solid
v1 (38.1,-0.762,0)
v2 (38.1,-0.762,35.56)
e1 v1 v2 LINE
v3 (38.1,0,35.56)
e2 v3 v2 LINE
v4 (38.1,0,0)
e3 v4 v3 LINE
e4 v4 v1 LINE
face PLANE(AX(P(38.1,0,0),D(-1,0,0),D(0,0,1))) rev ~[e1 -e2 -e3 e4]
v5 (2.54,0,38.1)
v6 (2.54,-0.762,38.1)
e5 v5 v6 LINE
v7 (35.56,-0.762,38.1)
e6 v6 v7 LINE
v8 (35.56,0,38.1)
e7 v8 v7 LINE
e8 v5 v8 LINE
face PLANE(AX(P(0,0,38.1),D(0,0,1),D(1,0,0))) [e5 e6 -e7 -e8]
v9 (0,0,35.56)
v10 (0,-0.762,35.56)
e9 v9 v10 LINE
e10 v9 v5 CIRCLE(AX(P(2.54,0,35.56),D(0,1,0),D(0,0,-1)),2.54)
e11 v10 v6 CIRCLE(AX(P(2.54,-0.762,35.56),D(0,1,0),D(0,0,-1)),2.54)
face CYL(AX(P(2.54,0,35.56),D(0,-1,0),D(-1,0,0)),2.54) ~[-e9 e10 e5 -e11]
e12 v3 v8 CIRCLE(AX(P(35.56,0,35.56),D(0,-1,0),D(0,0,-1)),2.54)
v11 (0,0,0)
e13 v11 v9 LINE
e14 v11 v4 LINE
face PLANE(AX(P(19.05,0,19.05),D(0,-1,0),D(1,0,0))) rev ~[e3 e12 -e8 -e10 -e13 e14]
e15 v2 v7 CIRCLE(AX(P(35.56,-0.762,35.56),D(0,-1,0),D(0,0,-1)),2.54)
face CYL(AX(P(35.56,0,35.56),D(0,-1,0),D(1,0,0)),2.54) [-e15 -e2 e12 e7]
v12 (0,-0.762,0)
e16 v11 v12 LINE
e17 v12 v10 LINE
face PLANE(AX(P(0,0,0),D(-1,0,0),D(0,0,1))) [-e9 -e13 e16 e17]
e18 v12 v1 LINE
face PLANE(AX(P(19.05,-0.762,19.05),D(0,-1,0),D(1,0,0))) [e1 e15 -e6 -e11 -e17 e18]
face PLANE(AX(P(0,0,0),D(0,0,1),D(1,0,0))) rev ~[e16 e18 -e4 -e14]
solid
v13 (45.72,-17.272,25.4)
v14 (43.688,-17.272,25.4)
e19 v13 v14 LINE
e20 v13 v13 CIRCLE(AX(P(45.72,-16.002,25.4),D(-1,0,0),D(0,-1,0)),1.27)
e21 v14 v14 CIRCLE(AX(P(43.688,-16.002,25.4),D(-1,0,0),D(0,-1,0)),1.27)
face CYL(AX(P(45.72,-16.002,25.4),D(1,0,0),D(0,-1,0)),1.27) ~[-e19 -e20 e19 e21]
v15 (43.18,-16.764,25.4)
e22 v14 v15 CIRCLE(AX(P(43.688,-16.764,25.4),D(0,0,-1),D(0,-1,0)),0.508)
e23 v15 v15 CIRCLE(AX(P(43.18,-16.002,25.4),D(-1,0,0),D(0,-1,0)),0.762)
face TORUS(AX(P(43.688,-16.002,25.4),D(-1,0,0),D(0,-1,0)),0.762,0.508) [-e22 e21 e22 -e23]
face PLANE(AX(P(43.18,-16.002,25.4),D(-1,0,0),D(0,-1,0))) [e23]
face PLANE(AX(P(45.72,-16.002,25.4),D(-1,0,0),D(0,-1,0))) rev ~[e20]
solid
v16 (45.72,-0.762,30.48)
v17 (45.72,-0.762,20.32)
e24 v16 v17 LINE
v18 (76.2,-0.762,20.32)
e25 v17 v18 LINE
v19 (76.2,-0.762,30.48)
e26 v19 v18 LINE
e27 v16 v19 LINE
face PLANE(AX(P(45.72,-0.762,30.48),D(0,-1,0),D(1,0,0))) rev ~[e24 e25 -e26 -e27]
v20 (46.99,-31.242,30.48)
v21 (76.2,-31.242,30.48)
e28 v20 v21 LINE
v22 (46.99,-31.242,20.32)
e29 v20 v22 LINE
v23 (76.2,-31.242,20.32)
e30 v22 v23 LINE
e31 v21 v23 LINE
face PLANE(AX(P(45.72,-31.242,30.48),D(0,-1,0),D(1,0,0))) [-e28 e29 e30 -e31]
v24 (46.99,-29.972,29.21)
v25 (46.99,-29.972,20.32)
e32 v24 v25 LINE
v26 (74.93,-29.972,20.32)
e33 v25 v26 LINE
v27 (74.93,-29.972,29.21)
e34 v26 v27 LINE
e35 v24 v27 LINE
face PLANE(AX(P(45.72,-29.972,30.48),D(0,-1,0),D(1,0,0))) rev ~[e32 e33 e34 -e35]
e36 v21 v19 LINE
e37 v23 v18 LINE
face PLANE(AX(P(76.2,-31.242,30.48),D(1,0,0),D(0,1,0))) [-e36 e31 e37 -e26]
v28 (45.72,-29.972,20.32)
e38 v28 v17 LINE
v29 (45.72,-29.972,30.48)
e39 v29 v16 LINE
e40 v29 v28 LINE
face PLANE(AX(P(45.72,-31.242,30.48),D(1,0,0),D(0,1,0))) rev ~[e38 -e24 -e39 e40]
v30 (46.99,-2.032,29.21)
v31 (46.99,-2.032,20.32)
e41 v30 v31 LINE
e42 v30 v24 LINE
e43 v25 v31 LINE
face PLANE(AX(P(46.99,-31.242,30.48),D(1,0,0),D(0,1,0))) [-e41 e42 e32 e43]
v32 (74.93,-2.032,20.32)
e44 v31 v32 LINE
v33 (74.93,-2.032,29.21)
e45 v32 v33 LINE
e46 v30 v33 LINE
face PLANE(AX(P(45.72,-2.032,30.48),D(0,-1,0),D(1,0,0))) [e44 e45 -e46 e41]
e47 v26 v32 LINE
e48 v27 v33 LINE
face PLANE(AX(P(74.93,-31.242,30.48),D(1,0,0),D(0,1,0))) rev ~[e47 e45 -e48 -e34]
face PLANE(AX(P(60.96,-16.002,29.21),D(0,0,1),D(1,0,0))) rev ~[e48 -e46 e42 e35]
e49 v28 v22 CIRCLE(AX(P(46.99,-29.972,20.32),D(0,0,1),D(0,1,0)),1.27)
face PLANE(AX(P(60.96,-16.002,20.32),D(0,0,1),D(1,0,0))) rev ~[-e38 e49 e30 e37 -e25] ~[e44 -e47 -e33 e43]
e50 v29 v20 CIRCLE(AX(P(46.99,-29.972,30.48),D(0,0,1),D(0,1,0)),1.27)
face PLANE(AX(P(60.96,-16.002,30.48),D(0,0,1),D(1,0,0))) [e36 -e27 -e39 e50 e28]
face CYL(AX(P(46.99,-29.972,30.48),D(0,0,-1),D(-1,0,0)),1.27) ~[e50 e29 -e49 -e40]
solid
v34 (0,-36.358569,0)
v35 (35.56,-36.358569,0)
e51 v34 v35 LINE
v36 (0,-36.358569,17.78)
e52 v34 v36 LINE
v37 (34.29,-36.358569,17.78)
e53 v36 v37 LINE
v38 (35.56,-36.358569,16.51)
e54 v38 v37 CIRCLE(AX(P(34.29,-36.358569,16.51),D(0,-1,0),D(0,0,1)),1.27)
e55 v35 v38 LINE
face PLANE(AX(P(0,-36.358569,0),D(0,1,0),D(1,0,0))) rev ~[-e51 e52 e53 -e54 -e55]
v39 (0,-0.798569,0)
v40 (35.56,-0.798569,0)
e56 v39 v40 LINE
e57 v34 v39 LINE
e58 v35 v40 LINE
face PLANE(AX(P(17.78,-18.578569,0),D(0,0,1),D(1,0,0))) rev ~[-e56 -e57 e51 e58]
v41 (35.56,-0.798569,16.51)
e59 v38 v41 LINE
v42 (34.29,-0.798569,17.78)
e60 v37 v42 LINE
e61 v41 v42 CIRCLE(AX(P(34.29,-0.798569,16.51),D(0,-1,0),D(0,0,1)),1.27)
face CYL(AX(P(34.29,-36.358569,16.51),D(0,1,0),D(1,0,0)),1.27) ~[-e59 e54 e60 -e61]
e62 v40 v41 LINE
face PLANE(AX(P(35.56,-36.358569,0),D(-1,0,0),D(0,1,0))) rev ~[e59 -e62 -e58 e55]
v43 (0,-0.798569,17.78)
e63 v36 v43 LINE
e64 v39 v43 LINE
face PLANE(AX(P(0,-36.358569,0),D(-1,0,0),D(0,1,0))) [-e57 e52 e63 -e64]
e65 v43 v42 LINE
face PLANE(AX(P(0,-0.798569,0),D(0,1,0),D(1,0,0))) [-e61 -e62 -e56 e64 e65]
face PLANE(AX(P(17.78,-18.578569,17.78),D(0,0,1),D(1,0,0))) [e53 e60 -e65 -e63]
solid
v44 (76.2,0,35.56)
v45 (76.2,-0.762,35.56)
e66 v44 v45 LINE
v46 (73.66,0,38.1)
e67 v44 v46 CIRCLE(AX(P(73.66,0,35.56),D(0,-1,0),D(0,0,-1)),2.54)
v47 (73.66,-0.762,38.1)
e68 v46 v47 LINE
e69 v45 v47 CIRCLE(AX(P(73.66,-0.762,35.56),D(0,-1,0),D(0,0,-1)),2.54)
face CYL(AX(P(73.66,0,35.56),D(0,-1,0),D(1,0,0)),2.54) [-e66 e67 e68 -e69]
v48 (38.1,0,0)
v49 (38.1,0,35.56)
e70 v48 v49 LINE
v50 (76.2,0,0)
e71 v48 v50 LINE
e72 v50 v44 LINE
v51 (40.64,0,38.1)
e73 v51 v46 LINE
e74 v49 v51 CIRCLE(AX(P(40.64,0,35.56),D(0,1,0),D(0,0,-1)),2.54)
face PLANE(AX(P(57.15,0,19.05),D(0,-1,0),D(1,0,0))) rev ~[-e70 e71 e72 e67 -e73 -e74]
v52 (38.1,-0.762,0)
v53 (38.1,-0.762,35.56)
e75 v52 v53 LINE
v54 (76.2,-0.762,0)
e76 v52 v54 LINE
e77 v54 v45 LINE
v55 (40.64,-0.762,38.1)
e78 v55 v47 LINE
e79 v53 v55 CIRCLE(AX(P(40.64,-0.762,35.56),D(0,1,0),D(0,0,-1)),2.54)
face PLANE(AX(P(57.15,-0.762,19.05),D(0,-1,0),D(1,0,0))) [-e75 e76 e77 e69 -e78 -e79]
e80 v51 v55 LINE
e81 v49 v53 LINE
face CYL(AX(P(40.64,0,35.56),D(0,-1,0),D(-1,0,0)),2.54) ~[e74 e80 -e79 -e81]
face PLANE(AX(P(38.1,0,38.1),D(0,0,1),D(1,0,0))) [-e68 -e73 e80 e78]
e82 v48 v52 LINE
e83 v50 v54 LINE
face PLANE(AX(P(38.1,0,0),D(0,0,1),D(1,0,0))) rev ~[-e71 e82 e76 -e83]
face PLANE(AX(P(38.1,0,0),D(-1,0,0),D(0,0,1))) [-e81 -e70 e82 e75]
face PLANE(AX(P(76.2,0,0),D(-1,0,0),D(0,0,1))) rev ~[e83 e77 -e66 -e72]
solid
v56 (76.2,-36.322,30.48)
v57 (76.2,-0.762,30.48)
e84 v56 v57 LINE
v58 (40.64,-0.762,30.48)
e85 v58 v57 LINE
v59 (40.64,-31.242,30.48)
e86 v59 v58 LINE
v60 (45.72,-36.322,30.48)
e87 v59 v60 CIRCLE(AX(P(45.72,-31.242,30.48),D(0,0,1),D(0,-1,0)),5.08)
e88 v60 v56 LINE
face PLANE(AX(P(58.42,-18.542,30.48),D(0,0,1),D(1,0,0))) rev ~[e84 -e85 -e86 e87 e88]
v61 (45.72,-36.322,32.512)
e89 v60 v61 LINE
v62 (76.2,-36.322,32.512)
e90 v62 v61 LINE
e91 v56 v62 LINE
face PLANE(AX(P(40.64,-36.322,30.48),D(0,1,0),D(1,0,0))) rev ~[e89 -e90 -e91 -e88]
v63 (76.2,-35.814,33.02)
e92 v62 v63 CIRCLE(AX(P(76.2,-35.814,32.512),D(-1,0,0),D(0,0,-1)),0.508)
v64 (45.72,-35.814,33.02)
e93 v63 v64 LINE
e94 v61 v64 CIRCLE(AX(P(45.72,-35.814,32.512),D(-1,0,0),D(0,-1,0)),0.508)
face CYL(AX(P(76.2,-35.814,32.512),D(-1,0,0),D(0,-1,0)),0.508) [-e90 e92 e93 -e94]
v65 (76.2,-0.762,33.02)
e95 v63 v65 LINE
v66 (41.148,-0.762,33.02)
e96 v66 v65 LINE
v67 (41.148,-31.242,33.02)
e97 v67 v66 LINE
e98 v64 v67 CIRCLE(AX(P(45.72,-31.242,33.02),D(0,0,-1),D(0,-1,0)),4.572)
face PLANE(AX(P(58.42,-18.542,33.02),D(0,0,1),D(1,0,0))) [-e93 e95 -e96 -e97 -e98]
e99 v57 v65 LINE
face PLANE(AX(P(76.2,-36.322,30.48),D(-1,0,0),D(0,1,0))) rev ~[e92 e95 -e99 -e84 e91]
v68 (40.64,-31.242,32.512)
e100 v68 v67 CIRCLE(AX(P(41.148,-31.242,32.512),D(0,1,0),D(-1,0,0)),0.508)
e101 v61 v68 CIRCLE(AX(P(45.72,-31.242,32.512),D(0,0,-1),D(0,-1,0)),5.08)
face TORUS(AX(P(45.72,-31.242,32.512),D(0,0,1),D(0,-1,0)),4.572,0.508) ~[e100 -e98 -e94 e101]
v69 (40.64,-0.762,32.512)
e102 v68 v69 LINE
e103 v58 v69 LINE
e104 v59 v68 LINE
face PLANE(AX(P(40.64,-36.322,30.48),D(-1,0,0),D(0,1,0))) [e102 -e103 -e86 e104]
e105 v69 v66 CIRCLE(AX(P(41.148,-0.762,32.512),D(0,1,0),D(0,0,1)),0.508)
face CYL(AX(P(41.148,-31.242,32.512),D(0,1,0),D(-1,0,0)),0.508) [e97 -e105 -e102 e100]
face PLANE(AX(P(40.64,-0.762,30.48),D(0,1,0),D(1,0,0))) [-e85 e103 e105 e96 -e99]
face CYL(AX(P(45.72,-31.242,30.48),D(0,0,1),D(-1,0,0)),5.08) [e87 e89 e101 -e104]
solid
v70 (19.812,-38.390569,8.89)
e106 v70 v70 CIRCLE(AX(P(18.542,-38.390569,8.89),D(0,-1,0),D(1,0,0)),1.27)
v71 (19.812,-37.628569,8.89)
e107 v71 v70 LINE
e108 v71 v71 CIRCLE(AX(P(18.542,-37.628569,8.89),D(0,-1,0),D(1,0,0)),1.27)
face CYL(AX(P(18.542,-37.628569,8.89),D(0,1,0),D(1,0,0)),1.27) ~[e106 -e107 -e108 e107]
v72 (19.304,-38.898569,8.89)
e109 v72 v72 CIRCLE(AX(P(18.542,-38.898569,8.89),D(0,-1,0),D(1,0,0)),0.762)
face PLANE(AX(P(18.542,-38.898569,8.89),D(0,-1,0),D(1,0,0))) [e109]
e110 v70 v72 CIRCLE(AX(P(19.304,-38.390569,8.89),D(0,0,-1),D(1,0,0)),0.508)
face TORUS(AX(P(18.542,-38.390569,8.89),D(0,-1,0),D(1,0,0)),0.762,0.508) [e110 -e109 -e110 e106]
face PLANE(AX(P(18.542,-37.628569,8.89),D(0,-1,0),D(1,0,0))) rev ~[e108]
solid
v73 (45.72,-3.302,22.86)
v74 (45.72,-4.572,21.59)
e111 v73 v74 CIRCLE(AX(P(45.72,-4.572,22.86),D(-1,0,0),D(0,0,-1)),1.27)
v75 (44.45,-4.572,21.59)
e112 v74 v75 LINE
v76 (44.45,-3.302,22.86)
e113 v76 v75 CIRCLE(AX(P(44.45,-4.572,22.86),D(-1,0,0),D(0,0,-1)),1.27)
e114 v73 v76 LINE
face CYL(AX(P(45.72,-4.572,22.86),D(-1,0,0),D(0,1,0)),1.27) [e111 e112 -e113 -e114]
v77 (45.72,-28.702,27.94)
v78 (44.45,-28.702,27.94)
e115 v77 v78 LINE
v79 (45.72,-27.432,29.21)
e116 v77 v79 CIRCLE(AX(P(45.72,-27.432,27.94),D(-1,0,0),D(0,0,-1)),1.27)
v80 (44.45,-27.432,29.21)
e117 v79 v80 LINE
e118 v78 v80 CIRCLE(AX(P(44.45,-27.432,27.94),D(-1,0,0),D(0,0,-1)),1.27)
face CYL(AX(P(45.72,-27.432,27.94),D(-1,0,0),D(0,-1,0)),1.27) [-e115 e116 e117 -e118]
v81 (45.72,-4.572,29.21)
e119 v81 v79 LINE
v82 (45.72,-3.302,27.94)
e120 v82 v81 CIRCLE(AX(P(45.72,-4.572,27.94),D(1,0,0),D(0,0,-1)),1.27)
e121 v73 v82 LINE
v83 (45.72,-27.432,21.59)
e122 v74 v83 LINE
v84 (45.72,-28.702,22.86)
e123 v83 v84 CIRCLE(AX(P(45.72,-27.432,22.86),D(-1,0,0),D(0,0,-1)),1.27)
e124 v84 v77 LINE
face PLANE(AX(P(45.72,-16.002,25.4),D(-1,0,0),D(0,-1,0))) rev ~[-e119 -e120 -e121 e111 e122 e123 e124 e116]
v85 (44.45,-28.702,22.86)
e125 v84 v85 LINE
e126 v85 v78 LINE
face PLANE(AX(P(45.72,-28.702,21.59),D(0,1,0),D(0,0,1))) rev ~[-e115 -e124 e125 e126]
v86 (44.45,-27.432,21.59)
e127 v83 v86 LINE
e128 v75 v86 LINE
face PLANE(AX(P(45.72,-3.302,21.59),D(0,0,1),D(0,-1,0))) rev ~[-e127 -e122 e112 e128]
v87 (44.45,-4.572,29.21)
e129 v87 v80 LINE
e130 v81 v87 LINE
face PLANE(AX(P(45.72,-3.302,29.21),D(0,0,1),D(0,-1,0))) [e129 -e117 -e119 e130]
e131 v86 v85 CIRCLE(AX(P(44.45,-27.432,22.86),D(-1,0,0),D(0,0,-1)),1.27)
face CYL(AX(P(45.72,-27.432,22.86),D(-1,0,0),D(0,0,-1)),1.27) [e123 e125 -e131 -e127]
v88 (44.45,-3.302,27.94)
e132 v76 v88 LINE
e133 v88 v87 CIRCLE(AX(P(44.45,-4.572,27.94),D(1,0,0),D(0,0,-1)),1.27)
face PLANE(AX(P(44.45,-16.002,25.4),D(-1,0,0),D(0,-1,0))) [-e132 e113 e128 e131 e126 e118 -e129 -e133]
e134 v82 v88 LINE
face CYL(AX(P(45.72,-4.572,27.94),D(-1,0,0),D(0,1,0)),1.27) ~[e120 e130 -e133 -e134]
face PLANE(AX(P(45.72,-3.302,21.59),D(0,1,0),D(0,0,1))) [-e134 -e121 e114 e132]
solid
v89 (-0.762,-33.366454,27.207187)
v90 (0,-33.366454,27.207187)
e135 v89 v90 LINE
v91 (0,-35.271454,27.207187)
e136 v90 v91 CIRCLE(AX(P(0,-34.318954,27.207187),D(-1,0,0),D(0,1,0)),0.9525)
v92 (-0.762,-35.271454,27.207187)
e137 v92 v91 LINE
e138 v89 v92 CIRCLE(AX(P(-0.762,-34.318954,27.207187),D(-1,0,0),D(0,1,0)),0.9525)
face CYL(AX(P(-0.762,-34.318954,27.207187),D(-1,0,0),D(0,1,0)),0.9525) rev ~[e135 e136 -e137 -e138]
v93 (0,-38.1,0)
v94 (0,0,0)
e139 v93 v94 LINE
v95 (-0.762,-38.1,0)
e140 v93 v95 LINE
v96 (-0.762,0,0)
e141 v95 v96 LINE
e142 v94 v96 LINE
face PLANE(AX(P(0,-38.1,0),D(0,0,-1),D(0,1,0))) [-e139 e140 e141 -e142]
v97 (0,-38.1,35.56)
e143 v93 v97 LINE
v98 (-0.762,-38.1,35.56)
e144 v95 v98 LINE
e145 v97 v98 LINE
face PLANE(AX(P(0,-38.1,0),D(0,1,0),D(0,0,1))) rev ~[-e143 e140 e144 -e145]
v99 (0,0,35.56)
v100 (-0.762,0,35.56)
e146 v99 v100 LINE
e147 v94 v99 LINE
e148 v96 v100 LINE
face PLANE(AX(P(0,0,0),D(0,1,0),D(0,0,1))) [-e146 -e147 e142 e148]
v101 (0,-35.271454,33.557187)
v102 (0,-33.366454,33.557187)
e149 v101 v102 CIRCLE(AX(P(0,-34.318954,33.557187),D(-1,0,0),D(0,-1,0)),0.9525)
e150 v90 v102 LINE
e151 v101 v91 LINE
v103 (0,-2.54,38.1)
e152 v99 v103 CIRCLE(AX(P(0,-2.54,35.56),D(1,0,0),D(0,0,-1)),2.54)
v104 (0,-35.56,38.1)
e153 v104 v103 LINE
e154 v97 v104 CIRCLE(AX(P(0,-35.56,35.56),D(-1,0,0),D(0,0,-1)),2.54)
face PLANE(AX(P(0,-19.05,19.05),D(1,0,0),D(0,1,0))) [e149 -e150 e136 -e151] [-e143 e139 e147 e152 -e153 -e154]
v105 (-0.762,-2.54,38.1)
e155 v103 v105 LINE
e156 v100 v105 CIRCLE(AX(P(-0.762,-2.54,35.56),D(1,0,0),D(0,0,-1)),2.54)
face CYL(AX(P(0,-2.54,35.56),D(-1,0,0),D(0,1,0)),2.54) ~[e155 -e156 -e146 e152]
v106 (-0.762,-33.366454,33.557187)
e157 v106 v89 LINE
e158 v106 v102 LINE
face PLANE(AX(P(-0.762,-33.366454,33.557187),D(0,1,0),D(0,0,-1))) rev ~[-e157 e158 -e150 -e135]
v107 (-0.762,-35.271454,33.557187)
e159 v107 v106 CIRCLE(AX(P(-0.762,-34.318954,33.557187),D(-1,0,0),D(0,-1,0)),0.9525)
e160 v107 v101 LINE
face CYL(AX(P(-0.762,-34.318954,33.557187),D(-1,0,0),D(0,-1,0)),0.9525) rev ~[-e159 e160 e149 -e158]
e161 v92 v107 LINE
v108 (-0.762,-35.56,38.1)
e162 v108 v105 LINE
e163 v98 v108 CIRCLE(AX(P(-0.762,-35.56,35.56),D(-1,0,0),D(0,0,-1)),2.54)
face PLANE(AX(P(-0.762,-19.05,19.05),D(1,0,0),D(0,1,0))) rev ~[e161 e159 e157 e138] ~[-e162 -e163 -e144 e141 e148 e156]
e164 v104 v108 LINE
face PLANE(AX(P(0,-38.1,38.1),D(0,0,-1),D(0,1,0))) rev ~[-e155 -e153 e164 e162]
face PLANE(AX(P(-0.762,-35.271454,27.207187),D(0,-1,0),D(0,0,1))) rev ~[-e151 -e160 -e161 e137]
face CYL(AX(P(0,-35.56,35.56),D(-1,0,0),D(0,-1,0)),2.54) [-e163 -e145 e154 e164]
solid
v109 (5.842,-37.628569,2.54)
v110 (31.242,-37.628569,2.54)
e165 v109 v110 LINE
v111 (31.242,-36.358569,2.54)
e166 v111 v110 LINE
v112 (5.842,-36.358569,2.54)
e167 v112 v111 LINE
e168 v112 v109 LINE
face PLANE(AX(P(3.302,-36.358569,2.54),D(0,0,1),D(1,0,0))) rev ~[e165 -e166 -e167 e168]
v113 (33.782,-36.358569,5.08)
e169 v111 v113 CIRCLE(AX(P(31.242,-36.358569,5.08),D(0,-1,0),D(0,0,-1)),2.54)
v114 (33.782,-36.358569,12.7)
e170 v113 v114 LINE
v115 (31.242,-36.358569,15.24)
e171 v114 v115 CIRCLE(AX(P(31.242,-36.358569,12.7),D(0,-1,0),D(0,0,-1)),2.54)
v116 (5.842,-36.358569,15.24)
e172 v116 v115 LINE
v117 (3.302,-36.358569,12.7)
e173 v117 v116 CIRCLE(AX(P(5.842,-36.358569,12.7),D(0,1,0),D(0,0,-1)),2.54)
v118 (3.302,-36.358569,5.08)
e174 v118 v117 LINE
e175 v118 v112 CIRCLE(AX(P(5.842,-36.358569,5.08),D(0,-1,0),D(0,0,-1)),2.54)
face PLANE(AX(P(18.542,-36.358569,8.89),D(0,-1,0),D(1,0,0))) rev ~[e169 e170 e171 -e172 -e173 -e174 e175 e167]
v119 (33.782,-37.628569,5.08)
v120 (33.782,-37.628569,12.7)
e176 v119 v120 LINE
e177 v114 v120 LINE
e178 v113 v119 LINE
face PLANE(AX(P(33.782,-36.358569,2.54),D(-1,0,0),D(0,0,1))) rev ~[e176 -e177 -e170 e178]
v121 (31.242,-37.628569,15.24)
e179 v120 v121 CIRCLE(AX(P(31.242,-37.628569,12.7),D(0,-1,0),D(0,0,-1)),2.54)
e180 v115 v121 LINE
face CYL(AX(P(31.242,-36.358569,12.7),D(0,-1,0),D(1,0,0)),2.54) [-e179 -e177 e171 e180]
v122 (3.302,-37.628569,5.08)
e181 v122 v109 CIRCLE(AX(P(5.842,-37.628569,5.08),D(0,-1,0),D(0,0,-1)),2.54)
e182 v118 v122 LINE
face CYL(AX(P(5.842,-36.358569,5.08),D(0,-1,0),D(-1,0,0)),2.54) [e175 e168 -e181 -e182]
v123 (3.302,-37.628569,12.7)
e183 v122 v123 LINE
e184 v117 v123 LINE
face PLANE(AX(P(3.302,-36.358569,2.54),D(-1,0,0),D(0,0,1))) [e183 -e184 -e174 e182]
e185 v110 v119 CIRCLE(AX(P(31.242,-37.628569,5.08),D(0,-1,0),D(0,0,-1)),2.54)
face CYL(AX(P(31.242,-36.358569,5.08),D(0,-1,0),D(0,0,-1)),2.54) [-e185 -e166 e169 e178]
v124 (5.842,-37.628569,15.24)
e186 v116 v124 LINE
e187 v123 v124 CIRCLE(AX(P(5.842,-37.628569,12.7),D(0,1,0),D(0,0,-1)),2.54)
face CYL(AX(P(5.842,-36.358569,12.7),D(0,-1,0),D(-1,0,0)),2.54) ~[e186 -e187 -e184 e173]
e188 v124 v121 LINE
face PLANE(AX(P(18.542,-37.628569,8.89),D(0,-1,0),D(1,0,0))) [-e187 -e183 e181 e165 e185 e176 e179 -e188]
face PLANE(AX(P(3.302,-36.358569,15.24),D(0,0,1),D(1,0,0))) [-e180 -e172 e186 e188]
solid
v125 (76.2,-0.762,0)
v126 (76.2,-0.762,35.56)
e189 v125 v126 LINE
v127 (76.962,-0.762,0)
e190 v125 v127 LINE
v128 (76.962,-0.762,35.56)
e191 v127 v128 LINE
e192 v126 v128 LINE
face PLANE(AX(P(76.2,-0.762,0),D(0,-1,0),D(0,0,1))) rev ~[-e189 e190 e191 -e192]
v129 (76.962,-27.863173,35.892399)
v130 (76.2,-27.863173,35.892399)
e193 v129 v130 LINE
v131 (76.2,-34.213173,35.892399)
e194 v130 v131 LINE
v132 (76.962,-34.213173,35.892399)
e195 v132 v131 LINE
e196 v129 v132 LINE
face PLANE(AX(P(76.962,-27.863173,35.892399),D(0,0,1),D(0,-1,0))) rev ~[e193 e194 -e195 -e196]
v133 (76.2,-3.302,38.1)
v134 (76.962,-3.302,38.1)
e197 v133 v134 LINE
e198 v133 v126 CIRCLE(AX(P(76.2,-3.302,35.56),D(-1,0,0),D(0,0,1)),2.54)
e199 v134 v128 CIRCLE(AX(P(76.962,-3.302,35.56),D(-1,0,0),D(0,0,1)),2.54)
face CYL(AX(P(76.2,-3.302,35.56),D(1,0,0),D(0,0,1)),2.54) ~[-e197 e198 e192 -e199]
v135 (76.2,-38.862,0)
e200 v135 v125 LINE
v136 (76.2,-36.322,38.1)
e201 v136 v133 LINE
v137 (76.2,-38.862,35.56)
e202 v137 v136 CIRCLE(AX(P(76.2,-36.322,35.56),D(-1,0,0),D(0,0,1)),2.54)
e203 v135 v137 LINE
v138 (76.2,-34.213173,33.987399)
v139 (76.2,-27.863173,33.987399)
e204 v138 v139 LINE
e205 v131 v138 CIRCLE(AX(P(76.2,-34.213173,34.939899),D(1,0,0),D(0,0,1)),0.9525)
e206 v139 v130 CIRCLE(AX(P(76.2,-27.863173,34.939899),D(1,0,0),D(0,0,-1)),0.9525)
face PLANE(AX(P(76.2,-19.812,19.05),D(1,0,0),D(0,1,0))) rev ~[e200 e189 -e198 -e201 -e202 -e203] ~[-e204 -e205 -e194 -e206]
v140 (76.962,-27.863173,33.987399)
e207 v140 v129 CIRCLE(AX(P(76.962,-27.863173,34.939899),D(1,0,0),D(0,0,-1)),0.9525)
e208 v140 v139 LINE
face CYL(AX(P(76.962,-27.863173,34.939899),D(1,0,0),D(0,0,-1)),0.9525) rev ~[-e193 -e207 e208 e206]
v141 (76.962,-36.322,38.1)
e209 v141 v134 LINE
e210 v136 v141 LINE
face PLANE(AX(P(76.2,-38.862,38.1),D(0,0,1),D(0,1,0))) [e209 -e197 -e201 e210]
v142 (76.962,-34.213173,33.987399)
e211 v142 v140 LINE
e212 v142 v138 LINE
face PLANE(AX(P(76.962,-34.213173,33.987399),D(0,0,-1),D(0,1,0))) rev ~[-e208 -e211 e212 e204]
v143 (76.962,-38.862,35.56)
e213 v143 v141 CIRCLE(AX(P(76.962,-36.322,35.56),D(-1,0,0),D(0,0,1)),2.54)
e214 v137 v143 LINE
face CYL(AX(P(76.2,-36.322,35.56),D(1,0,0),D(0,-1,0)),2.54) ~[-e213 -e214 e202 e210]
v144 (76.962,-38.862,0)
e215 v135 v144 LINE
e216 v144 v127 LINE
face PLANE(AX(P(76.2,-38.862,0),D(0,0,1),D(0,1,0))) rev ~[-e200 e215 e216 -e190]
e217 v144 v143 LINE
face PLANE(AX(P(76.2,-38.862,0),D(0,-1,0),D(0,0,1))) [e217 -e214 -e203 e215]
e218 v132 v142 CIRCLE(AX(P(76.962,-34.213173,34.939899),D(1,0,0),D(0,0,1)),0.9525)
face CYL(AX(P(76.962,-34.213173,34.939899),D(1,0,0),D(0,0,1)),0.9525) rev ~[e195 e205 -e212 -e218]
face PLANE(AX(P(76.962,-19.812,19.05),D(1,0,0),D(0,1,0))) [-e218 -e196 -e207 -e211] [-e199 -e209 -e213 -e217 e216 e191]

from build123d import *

# Parameters (mm, degrees)
F0_W      = 38.1
F0_H      = 38.1
F2_DEPTH  = 0.762
F1_W      = 38.1
F1_H      = 38.1
F3_DEPTH  = 0.762
F4_W      = 35.56
F4_H      = 35.56
F5_DEPTH  = 17.78
F8_W      = 30.48
F8_H      = 30.48
F9_DEPTH  = 10.16
F7_W      = 35.56
F7_H      = 35.56
F10_DEPTH = 2.54
F11_W     = 30.48
F11_H     = 12.7
F12_DEPTH = 1.27
F13_R     = 1.27
F14_DEPTH = 1.27
F16_R     = 1.27
F17_DEPTH = 2.54
F15_W     = 25.4
F15_H     = 7.62
F18_DEPTH = 1.27
F19_R     = 2.54
F19_2_R   = 2.54
F19_3_R   = 2.54
F20_R     = 5.08
F21_R     = 1.27
F21_2_R   = 1.27
F23_DEPTH = 12.7
F24_DEPTH = 0.762
F26_W     = 38.1
F26_H     = 38.1
F27_DEPTH = 0.762
F29_DEPTH = 12.7
F30_R     = 2.54
F30_2_R   = 2.54
F31_T     = 1.27
F33_DEPTH = 25.4
F34_R     = 0.508
F35_R     = 0.508
F36_R     = 0.508
F38_R     = 1.27


# Not quite as in the source:
# - two fillets or chamfers of one size are made in one step
# - a shell that OpenCascade refuses in one call is made with other operations: the cavity is built on its own and cut out
# - a feature names something its author has since deleted; it is built from what else it names


with BuildPart() as f2:
    # F0 (on Right) → F2 (new body)
    with BuildSketch(Plane.YZ):
        with Locations((-19.05, 19.05)):
            Rectangle(F0_W, F0_H)
    extrude(amount=-F2_DEPTH)

    # F19
    f19_edges = [f2.edges().sort_by_distance(p)[0] for p in [
        (-0.381, -38.1, 38.1),
        (-0.381, 0, 38.1),
    ]]
    fillet(f19_edges, radius=F19_R)

    # F22 (on face) → F23 (cut)
    with BuildSketch(Plane.YZ):
        with BuildLine():
            ThreePointArc((35.283215344, 34.4806989491), (34.330715344, 35.4331989491), (33.378215344, 34.4806989491))
            Line((33.378215344, 34.4806989491), (33.378215344, 28.1306989491))
            ThreePointArc((33.378215344, 28.1306989491), (34.330715344, 27.1781989491), (35.283215344, 28.1306989491))
            Line((35.283215344, 28.1306989491), (35.283215344, 34.4806989491))
        make_face()
    extrude(amount=-F23_DEPTH, mode=Mode.SUBTRACT)

    # F32 (on face) → F33 (cut)
    with BuildSketch(Plane(origin=(-0.762, 0, 0), x_dir=(0, -1, 0), z_dir=(-1, 0, 0))):
        with BuildLine():
            ThreePointArc((35.2714537645, 33.5571871057), (34.3189537645, 34.5096871057), (33.3664537645, 33.5571871057))
            Line((33.3664537645, 33.5571871057), (33.3664537645, 27.2071871057))
            ThreePointArc((33.3664537645, 27.2071871057), (34.3189537645, 26.2546871057), (35.2714537645, 27.2071871057))
            Line((35.2714537645, 27.2071871057), (35.2714537645, 33.5571871057))
        make_face()
    extrude(amount=-F33_DEPTH, mode=Mode.SUBTRACT)


with BuildPart() as f3:
    # F1 (on Front) → F3 (new body)
    with BuildSketch(Plane.XZ):
        with Locations((19.05, 19.05)):
            Rectangle(F1_W, F1_H)
    extrude(amount=F3_DEPTH)

    # F19#2
    f19_2_edges = [f3.edges().sort_by_distance(p)[0] for p in [
        (0, -0.381, 38.1),
        (38.1, -0.381, 38.1),
    ]]
    fillet(f19_2_edges, radius=F19_2_R)


with BuildPart() as f5:
    # F4 (on Top) → F5 (new body)
    with BuildSketch(Plane.XY):
        with Locations((17.78, -18.5785688174)):
            Rectangle(F4_W, F4_H)
    extrude(amount=F5_DEPTH)

    # F21
    f21_edges = [f5.edges().sort_by_distance(p)[0] for p in [
        (35.56, -18.578569, 17.78),
    ]]
    fillet(f21_edges, radius=F21_R)


with BuildPart() as f9:
    # F8 (on offset) → F9 (new body)
    with BuildSketch(Plane.XY.offset(30.48)):
        with Locations((60.96, -16.002)):
            Rectangle(F8_W, F8_H)
    extrude(amount=-F9_DEPTH)

    # F21#2
    f21_2_edges = [f9.edges().sort_by_distance(p)[0] for p in [
        (45.72, -31.242, 25.4),
    ]]
    fillet(f21_2_edges, radius=F21_2_R)

    # F31: shell of thickness 1.27, made by hand


with BuildPart() as f10:
    # F7 (on offset) → F10 (new body)
    with BuildSketch(Plane.XY.offset(30.48)):
        with Locations((58.42, -18.542)):
            Rectangle(F7_W, F7_H)
    extrude(amount=F10_DEPTH)

    # F20
    f20_edges = [f10.edges().sort_by_distance(p)[0] for p in [
        (40.64, -36.322, 31.75),
    ]]
    fillet(f20_edges, radius=F20_R)

    # F34
    f34_edges = [f10.edges().sort_by_distance(p)[0] for p in [
        (40.64, -16.002, 33.02),
    ]]
    fillet(f34_edges, radius=F34_R)


with BuildPart() as f12:
    # F11 (on face) → F12 (new body)
    with BuildSketch(Plane.XZ.offset(36.3585688174)):
        with Locations((18.542, 8.89)):
            Rectangle(F11_W, F11_H)
    extrude(amount=F12_DEPTH)

    # F19#3
    f19_3_edges = [f12.edges().sort_by_distance(p)[0] for p in [
        (3.302, -36.993569, 2.54),
        (33.782, -36.993569, 2.54),
        (33.782, -36.993569, 15.24),
        (3.302, -36.993569, 15.24),
    ]]
    fillet(f19_3_edges, radius=F19_3_R)


with BuildPart() as f14:
    # F13 (on face) → F14 (new body)
    with BuildSketch(Plane.XZ.offset(37.6285688174)):
        with Locations((18.542, 8.89)):
            Circle(F13_R)
    extrude(amount=F14_DEPTH)

    # F35
    f35_edges = [f14.edges().sort_by_distance(p)[0] for p in [
        (17.272, -38.898569, 8.89),
    ]]
    fillet(f35_edges, radius=F35_R)


with BuildPart() as f17:
    # F16 (on face) → F17 (new body)
    with BuildSketch(Plane(origin=(45.72, 0, 0), x_dir=(0, -1, 0), z_dir=(-1, 0, 0))):
        with Locations((16.002, 25.4)):
            Circle(F16_R)
    extrude(amount=F17_DEPTH)

    # F36
    f36_edges = [f17.edges().sort_by_distance(p)[0] for p in [
        (43.18, -14.732, 25.4),
    ]]
    fillet(f36_edges, radius=F36_R)


with BuildPart() as f18:
    # F15 (on face) → F18 (new body)
    with BuildSketch(Plane(origin=(45.72, 0, 0), x_dir=(0, -1, 0), z_dir=(-1, 0, 0))):
        with Locations((16.002, 25.4)):
            Rectangle(F15_W, F15_H)
    extrude(amount=F18_DEPTH)

    # F38
    f38_edges = [f18.edges().sort_by_distance(p)[0] for p in [
        (45.085, -28.702, 21.59),
        (45.085, -28.702, 29.21),
        (45.085, -3.302, 21.59),
        (45.085, -3.302, 29.21),
    ]]
    fillet(f38_edges, radius=F38_R)


with BuildPart() as f24:
    # F1 (on Front) → F24 (new body)
    with BuildSketch(Plane.XZ):
        with Locations((57.15, 19.05)):
            Rectangle(F1_W, F1_H)
    extrude(amount=F24_DEPTH)

    # F30
    f30_edges = [f24.edges().sort_by_distance(p)[0] for p in [
        (76.2, -0.381, 38.1),
        (38.1, -0.381, 38.1),
    ]]
    fillet(f30_edges, radius=F30_R)


with BuildPart() as f27:
    # F26 (on offset) → F27 (new body)
    with BuildSketch(Plane.YZ.offset(76.2)):
        with Locations((-19.812, 19.05)):
            Rectangle(F26_W, F26_H)
    extrude(amount=F27_DEPTH)

    # F28 (on face) → F29 (cut)
    with BuildSketch(Plane.YZ.offset(76.962)):
        with BuildLine():
            Line((-27.8631728142, 35.8923991907), (-34.2131728142, 35.8923991907))
            ThreePointArc((-34.2131728142, 35.8923991907), (-35.1656728142, 34.9398991907), (-34.2131728142, 33.9873991907))
            Line((-34.2131728142, 33.9873991907), (-27.8631728142, 33.9873991907))
            ThreePointArc((-27.8631728142, 33.9873991907), (-26.9106728142, 34.9398991907), (-27.8631728142, 35.8923991907))
        make_face()
    extrude(amount=-F29_DEPTH, mode=Mode.SUBTRACT)

    # F30#2
    f30_2_edges = [f27.edges().sort_by_distance(p)[0] for p in [
        (76.581, -0.762, 38.1),
        (76.581, -38.862, 38.1),
    ]]
    fillet(f30_2_edges, radius=F30_2_R)


with BuildPart() as f31_core1:
    # F31_t2: copy of F9
    add(f9.part)

    # the walls: a layer under each face that stays
    f31_faces = [f31_core1.faces().sort_by_distance(p)[0] for p in [
        (45.72, -15.367, 25.4),
        (60.96, -16.002, 30.48),
        (60.96, -0.762, 25.4),
        (61.595, -31.242, 25.4),
        (76.2, -16.002, 25.4),
    ]]
    thicken(f31_faces, amount=-F31_T, mode=Mode.SUBTRACT)


with BuildPart() as f9_1:
    add(f9.part)

    # what is left inside the walls is the cavity
    f31_cavity = [f31_core1.part.solids().sort_by_distance(p)[0] for p in [
        (60.96, -20.658667, 20.3327),
    ]]
    add(f31_cavity, mode=Mode.SUBTRACT)


solid = Compound([f2.part, f3.part, f5.part, f10.part, f12.part, f14.part, f17.part, f18.part, f24.part, f27.part, f9_1.part])
